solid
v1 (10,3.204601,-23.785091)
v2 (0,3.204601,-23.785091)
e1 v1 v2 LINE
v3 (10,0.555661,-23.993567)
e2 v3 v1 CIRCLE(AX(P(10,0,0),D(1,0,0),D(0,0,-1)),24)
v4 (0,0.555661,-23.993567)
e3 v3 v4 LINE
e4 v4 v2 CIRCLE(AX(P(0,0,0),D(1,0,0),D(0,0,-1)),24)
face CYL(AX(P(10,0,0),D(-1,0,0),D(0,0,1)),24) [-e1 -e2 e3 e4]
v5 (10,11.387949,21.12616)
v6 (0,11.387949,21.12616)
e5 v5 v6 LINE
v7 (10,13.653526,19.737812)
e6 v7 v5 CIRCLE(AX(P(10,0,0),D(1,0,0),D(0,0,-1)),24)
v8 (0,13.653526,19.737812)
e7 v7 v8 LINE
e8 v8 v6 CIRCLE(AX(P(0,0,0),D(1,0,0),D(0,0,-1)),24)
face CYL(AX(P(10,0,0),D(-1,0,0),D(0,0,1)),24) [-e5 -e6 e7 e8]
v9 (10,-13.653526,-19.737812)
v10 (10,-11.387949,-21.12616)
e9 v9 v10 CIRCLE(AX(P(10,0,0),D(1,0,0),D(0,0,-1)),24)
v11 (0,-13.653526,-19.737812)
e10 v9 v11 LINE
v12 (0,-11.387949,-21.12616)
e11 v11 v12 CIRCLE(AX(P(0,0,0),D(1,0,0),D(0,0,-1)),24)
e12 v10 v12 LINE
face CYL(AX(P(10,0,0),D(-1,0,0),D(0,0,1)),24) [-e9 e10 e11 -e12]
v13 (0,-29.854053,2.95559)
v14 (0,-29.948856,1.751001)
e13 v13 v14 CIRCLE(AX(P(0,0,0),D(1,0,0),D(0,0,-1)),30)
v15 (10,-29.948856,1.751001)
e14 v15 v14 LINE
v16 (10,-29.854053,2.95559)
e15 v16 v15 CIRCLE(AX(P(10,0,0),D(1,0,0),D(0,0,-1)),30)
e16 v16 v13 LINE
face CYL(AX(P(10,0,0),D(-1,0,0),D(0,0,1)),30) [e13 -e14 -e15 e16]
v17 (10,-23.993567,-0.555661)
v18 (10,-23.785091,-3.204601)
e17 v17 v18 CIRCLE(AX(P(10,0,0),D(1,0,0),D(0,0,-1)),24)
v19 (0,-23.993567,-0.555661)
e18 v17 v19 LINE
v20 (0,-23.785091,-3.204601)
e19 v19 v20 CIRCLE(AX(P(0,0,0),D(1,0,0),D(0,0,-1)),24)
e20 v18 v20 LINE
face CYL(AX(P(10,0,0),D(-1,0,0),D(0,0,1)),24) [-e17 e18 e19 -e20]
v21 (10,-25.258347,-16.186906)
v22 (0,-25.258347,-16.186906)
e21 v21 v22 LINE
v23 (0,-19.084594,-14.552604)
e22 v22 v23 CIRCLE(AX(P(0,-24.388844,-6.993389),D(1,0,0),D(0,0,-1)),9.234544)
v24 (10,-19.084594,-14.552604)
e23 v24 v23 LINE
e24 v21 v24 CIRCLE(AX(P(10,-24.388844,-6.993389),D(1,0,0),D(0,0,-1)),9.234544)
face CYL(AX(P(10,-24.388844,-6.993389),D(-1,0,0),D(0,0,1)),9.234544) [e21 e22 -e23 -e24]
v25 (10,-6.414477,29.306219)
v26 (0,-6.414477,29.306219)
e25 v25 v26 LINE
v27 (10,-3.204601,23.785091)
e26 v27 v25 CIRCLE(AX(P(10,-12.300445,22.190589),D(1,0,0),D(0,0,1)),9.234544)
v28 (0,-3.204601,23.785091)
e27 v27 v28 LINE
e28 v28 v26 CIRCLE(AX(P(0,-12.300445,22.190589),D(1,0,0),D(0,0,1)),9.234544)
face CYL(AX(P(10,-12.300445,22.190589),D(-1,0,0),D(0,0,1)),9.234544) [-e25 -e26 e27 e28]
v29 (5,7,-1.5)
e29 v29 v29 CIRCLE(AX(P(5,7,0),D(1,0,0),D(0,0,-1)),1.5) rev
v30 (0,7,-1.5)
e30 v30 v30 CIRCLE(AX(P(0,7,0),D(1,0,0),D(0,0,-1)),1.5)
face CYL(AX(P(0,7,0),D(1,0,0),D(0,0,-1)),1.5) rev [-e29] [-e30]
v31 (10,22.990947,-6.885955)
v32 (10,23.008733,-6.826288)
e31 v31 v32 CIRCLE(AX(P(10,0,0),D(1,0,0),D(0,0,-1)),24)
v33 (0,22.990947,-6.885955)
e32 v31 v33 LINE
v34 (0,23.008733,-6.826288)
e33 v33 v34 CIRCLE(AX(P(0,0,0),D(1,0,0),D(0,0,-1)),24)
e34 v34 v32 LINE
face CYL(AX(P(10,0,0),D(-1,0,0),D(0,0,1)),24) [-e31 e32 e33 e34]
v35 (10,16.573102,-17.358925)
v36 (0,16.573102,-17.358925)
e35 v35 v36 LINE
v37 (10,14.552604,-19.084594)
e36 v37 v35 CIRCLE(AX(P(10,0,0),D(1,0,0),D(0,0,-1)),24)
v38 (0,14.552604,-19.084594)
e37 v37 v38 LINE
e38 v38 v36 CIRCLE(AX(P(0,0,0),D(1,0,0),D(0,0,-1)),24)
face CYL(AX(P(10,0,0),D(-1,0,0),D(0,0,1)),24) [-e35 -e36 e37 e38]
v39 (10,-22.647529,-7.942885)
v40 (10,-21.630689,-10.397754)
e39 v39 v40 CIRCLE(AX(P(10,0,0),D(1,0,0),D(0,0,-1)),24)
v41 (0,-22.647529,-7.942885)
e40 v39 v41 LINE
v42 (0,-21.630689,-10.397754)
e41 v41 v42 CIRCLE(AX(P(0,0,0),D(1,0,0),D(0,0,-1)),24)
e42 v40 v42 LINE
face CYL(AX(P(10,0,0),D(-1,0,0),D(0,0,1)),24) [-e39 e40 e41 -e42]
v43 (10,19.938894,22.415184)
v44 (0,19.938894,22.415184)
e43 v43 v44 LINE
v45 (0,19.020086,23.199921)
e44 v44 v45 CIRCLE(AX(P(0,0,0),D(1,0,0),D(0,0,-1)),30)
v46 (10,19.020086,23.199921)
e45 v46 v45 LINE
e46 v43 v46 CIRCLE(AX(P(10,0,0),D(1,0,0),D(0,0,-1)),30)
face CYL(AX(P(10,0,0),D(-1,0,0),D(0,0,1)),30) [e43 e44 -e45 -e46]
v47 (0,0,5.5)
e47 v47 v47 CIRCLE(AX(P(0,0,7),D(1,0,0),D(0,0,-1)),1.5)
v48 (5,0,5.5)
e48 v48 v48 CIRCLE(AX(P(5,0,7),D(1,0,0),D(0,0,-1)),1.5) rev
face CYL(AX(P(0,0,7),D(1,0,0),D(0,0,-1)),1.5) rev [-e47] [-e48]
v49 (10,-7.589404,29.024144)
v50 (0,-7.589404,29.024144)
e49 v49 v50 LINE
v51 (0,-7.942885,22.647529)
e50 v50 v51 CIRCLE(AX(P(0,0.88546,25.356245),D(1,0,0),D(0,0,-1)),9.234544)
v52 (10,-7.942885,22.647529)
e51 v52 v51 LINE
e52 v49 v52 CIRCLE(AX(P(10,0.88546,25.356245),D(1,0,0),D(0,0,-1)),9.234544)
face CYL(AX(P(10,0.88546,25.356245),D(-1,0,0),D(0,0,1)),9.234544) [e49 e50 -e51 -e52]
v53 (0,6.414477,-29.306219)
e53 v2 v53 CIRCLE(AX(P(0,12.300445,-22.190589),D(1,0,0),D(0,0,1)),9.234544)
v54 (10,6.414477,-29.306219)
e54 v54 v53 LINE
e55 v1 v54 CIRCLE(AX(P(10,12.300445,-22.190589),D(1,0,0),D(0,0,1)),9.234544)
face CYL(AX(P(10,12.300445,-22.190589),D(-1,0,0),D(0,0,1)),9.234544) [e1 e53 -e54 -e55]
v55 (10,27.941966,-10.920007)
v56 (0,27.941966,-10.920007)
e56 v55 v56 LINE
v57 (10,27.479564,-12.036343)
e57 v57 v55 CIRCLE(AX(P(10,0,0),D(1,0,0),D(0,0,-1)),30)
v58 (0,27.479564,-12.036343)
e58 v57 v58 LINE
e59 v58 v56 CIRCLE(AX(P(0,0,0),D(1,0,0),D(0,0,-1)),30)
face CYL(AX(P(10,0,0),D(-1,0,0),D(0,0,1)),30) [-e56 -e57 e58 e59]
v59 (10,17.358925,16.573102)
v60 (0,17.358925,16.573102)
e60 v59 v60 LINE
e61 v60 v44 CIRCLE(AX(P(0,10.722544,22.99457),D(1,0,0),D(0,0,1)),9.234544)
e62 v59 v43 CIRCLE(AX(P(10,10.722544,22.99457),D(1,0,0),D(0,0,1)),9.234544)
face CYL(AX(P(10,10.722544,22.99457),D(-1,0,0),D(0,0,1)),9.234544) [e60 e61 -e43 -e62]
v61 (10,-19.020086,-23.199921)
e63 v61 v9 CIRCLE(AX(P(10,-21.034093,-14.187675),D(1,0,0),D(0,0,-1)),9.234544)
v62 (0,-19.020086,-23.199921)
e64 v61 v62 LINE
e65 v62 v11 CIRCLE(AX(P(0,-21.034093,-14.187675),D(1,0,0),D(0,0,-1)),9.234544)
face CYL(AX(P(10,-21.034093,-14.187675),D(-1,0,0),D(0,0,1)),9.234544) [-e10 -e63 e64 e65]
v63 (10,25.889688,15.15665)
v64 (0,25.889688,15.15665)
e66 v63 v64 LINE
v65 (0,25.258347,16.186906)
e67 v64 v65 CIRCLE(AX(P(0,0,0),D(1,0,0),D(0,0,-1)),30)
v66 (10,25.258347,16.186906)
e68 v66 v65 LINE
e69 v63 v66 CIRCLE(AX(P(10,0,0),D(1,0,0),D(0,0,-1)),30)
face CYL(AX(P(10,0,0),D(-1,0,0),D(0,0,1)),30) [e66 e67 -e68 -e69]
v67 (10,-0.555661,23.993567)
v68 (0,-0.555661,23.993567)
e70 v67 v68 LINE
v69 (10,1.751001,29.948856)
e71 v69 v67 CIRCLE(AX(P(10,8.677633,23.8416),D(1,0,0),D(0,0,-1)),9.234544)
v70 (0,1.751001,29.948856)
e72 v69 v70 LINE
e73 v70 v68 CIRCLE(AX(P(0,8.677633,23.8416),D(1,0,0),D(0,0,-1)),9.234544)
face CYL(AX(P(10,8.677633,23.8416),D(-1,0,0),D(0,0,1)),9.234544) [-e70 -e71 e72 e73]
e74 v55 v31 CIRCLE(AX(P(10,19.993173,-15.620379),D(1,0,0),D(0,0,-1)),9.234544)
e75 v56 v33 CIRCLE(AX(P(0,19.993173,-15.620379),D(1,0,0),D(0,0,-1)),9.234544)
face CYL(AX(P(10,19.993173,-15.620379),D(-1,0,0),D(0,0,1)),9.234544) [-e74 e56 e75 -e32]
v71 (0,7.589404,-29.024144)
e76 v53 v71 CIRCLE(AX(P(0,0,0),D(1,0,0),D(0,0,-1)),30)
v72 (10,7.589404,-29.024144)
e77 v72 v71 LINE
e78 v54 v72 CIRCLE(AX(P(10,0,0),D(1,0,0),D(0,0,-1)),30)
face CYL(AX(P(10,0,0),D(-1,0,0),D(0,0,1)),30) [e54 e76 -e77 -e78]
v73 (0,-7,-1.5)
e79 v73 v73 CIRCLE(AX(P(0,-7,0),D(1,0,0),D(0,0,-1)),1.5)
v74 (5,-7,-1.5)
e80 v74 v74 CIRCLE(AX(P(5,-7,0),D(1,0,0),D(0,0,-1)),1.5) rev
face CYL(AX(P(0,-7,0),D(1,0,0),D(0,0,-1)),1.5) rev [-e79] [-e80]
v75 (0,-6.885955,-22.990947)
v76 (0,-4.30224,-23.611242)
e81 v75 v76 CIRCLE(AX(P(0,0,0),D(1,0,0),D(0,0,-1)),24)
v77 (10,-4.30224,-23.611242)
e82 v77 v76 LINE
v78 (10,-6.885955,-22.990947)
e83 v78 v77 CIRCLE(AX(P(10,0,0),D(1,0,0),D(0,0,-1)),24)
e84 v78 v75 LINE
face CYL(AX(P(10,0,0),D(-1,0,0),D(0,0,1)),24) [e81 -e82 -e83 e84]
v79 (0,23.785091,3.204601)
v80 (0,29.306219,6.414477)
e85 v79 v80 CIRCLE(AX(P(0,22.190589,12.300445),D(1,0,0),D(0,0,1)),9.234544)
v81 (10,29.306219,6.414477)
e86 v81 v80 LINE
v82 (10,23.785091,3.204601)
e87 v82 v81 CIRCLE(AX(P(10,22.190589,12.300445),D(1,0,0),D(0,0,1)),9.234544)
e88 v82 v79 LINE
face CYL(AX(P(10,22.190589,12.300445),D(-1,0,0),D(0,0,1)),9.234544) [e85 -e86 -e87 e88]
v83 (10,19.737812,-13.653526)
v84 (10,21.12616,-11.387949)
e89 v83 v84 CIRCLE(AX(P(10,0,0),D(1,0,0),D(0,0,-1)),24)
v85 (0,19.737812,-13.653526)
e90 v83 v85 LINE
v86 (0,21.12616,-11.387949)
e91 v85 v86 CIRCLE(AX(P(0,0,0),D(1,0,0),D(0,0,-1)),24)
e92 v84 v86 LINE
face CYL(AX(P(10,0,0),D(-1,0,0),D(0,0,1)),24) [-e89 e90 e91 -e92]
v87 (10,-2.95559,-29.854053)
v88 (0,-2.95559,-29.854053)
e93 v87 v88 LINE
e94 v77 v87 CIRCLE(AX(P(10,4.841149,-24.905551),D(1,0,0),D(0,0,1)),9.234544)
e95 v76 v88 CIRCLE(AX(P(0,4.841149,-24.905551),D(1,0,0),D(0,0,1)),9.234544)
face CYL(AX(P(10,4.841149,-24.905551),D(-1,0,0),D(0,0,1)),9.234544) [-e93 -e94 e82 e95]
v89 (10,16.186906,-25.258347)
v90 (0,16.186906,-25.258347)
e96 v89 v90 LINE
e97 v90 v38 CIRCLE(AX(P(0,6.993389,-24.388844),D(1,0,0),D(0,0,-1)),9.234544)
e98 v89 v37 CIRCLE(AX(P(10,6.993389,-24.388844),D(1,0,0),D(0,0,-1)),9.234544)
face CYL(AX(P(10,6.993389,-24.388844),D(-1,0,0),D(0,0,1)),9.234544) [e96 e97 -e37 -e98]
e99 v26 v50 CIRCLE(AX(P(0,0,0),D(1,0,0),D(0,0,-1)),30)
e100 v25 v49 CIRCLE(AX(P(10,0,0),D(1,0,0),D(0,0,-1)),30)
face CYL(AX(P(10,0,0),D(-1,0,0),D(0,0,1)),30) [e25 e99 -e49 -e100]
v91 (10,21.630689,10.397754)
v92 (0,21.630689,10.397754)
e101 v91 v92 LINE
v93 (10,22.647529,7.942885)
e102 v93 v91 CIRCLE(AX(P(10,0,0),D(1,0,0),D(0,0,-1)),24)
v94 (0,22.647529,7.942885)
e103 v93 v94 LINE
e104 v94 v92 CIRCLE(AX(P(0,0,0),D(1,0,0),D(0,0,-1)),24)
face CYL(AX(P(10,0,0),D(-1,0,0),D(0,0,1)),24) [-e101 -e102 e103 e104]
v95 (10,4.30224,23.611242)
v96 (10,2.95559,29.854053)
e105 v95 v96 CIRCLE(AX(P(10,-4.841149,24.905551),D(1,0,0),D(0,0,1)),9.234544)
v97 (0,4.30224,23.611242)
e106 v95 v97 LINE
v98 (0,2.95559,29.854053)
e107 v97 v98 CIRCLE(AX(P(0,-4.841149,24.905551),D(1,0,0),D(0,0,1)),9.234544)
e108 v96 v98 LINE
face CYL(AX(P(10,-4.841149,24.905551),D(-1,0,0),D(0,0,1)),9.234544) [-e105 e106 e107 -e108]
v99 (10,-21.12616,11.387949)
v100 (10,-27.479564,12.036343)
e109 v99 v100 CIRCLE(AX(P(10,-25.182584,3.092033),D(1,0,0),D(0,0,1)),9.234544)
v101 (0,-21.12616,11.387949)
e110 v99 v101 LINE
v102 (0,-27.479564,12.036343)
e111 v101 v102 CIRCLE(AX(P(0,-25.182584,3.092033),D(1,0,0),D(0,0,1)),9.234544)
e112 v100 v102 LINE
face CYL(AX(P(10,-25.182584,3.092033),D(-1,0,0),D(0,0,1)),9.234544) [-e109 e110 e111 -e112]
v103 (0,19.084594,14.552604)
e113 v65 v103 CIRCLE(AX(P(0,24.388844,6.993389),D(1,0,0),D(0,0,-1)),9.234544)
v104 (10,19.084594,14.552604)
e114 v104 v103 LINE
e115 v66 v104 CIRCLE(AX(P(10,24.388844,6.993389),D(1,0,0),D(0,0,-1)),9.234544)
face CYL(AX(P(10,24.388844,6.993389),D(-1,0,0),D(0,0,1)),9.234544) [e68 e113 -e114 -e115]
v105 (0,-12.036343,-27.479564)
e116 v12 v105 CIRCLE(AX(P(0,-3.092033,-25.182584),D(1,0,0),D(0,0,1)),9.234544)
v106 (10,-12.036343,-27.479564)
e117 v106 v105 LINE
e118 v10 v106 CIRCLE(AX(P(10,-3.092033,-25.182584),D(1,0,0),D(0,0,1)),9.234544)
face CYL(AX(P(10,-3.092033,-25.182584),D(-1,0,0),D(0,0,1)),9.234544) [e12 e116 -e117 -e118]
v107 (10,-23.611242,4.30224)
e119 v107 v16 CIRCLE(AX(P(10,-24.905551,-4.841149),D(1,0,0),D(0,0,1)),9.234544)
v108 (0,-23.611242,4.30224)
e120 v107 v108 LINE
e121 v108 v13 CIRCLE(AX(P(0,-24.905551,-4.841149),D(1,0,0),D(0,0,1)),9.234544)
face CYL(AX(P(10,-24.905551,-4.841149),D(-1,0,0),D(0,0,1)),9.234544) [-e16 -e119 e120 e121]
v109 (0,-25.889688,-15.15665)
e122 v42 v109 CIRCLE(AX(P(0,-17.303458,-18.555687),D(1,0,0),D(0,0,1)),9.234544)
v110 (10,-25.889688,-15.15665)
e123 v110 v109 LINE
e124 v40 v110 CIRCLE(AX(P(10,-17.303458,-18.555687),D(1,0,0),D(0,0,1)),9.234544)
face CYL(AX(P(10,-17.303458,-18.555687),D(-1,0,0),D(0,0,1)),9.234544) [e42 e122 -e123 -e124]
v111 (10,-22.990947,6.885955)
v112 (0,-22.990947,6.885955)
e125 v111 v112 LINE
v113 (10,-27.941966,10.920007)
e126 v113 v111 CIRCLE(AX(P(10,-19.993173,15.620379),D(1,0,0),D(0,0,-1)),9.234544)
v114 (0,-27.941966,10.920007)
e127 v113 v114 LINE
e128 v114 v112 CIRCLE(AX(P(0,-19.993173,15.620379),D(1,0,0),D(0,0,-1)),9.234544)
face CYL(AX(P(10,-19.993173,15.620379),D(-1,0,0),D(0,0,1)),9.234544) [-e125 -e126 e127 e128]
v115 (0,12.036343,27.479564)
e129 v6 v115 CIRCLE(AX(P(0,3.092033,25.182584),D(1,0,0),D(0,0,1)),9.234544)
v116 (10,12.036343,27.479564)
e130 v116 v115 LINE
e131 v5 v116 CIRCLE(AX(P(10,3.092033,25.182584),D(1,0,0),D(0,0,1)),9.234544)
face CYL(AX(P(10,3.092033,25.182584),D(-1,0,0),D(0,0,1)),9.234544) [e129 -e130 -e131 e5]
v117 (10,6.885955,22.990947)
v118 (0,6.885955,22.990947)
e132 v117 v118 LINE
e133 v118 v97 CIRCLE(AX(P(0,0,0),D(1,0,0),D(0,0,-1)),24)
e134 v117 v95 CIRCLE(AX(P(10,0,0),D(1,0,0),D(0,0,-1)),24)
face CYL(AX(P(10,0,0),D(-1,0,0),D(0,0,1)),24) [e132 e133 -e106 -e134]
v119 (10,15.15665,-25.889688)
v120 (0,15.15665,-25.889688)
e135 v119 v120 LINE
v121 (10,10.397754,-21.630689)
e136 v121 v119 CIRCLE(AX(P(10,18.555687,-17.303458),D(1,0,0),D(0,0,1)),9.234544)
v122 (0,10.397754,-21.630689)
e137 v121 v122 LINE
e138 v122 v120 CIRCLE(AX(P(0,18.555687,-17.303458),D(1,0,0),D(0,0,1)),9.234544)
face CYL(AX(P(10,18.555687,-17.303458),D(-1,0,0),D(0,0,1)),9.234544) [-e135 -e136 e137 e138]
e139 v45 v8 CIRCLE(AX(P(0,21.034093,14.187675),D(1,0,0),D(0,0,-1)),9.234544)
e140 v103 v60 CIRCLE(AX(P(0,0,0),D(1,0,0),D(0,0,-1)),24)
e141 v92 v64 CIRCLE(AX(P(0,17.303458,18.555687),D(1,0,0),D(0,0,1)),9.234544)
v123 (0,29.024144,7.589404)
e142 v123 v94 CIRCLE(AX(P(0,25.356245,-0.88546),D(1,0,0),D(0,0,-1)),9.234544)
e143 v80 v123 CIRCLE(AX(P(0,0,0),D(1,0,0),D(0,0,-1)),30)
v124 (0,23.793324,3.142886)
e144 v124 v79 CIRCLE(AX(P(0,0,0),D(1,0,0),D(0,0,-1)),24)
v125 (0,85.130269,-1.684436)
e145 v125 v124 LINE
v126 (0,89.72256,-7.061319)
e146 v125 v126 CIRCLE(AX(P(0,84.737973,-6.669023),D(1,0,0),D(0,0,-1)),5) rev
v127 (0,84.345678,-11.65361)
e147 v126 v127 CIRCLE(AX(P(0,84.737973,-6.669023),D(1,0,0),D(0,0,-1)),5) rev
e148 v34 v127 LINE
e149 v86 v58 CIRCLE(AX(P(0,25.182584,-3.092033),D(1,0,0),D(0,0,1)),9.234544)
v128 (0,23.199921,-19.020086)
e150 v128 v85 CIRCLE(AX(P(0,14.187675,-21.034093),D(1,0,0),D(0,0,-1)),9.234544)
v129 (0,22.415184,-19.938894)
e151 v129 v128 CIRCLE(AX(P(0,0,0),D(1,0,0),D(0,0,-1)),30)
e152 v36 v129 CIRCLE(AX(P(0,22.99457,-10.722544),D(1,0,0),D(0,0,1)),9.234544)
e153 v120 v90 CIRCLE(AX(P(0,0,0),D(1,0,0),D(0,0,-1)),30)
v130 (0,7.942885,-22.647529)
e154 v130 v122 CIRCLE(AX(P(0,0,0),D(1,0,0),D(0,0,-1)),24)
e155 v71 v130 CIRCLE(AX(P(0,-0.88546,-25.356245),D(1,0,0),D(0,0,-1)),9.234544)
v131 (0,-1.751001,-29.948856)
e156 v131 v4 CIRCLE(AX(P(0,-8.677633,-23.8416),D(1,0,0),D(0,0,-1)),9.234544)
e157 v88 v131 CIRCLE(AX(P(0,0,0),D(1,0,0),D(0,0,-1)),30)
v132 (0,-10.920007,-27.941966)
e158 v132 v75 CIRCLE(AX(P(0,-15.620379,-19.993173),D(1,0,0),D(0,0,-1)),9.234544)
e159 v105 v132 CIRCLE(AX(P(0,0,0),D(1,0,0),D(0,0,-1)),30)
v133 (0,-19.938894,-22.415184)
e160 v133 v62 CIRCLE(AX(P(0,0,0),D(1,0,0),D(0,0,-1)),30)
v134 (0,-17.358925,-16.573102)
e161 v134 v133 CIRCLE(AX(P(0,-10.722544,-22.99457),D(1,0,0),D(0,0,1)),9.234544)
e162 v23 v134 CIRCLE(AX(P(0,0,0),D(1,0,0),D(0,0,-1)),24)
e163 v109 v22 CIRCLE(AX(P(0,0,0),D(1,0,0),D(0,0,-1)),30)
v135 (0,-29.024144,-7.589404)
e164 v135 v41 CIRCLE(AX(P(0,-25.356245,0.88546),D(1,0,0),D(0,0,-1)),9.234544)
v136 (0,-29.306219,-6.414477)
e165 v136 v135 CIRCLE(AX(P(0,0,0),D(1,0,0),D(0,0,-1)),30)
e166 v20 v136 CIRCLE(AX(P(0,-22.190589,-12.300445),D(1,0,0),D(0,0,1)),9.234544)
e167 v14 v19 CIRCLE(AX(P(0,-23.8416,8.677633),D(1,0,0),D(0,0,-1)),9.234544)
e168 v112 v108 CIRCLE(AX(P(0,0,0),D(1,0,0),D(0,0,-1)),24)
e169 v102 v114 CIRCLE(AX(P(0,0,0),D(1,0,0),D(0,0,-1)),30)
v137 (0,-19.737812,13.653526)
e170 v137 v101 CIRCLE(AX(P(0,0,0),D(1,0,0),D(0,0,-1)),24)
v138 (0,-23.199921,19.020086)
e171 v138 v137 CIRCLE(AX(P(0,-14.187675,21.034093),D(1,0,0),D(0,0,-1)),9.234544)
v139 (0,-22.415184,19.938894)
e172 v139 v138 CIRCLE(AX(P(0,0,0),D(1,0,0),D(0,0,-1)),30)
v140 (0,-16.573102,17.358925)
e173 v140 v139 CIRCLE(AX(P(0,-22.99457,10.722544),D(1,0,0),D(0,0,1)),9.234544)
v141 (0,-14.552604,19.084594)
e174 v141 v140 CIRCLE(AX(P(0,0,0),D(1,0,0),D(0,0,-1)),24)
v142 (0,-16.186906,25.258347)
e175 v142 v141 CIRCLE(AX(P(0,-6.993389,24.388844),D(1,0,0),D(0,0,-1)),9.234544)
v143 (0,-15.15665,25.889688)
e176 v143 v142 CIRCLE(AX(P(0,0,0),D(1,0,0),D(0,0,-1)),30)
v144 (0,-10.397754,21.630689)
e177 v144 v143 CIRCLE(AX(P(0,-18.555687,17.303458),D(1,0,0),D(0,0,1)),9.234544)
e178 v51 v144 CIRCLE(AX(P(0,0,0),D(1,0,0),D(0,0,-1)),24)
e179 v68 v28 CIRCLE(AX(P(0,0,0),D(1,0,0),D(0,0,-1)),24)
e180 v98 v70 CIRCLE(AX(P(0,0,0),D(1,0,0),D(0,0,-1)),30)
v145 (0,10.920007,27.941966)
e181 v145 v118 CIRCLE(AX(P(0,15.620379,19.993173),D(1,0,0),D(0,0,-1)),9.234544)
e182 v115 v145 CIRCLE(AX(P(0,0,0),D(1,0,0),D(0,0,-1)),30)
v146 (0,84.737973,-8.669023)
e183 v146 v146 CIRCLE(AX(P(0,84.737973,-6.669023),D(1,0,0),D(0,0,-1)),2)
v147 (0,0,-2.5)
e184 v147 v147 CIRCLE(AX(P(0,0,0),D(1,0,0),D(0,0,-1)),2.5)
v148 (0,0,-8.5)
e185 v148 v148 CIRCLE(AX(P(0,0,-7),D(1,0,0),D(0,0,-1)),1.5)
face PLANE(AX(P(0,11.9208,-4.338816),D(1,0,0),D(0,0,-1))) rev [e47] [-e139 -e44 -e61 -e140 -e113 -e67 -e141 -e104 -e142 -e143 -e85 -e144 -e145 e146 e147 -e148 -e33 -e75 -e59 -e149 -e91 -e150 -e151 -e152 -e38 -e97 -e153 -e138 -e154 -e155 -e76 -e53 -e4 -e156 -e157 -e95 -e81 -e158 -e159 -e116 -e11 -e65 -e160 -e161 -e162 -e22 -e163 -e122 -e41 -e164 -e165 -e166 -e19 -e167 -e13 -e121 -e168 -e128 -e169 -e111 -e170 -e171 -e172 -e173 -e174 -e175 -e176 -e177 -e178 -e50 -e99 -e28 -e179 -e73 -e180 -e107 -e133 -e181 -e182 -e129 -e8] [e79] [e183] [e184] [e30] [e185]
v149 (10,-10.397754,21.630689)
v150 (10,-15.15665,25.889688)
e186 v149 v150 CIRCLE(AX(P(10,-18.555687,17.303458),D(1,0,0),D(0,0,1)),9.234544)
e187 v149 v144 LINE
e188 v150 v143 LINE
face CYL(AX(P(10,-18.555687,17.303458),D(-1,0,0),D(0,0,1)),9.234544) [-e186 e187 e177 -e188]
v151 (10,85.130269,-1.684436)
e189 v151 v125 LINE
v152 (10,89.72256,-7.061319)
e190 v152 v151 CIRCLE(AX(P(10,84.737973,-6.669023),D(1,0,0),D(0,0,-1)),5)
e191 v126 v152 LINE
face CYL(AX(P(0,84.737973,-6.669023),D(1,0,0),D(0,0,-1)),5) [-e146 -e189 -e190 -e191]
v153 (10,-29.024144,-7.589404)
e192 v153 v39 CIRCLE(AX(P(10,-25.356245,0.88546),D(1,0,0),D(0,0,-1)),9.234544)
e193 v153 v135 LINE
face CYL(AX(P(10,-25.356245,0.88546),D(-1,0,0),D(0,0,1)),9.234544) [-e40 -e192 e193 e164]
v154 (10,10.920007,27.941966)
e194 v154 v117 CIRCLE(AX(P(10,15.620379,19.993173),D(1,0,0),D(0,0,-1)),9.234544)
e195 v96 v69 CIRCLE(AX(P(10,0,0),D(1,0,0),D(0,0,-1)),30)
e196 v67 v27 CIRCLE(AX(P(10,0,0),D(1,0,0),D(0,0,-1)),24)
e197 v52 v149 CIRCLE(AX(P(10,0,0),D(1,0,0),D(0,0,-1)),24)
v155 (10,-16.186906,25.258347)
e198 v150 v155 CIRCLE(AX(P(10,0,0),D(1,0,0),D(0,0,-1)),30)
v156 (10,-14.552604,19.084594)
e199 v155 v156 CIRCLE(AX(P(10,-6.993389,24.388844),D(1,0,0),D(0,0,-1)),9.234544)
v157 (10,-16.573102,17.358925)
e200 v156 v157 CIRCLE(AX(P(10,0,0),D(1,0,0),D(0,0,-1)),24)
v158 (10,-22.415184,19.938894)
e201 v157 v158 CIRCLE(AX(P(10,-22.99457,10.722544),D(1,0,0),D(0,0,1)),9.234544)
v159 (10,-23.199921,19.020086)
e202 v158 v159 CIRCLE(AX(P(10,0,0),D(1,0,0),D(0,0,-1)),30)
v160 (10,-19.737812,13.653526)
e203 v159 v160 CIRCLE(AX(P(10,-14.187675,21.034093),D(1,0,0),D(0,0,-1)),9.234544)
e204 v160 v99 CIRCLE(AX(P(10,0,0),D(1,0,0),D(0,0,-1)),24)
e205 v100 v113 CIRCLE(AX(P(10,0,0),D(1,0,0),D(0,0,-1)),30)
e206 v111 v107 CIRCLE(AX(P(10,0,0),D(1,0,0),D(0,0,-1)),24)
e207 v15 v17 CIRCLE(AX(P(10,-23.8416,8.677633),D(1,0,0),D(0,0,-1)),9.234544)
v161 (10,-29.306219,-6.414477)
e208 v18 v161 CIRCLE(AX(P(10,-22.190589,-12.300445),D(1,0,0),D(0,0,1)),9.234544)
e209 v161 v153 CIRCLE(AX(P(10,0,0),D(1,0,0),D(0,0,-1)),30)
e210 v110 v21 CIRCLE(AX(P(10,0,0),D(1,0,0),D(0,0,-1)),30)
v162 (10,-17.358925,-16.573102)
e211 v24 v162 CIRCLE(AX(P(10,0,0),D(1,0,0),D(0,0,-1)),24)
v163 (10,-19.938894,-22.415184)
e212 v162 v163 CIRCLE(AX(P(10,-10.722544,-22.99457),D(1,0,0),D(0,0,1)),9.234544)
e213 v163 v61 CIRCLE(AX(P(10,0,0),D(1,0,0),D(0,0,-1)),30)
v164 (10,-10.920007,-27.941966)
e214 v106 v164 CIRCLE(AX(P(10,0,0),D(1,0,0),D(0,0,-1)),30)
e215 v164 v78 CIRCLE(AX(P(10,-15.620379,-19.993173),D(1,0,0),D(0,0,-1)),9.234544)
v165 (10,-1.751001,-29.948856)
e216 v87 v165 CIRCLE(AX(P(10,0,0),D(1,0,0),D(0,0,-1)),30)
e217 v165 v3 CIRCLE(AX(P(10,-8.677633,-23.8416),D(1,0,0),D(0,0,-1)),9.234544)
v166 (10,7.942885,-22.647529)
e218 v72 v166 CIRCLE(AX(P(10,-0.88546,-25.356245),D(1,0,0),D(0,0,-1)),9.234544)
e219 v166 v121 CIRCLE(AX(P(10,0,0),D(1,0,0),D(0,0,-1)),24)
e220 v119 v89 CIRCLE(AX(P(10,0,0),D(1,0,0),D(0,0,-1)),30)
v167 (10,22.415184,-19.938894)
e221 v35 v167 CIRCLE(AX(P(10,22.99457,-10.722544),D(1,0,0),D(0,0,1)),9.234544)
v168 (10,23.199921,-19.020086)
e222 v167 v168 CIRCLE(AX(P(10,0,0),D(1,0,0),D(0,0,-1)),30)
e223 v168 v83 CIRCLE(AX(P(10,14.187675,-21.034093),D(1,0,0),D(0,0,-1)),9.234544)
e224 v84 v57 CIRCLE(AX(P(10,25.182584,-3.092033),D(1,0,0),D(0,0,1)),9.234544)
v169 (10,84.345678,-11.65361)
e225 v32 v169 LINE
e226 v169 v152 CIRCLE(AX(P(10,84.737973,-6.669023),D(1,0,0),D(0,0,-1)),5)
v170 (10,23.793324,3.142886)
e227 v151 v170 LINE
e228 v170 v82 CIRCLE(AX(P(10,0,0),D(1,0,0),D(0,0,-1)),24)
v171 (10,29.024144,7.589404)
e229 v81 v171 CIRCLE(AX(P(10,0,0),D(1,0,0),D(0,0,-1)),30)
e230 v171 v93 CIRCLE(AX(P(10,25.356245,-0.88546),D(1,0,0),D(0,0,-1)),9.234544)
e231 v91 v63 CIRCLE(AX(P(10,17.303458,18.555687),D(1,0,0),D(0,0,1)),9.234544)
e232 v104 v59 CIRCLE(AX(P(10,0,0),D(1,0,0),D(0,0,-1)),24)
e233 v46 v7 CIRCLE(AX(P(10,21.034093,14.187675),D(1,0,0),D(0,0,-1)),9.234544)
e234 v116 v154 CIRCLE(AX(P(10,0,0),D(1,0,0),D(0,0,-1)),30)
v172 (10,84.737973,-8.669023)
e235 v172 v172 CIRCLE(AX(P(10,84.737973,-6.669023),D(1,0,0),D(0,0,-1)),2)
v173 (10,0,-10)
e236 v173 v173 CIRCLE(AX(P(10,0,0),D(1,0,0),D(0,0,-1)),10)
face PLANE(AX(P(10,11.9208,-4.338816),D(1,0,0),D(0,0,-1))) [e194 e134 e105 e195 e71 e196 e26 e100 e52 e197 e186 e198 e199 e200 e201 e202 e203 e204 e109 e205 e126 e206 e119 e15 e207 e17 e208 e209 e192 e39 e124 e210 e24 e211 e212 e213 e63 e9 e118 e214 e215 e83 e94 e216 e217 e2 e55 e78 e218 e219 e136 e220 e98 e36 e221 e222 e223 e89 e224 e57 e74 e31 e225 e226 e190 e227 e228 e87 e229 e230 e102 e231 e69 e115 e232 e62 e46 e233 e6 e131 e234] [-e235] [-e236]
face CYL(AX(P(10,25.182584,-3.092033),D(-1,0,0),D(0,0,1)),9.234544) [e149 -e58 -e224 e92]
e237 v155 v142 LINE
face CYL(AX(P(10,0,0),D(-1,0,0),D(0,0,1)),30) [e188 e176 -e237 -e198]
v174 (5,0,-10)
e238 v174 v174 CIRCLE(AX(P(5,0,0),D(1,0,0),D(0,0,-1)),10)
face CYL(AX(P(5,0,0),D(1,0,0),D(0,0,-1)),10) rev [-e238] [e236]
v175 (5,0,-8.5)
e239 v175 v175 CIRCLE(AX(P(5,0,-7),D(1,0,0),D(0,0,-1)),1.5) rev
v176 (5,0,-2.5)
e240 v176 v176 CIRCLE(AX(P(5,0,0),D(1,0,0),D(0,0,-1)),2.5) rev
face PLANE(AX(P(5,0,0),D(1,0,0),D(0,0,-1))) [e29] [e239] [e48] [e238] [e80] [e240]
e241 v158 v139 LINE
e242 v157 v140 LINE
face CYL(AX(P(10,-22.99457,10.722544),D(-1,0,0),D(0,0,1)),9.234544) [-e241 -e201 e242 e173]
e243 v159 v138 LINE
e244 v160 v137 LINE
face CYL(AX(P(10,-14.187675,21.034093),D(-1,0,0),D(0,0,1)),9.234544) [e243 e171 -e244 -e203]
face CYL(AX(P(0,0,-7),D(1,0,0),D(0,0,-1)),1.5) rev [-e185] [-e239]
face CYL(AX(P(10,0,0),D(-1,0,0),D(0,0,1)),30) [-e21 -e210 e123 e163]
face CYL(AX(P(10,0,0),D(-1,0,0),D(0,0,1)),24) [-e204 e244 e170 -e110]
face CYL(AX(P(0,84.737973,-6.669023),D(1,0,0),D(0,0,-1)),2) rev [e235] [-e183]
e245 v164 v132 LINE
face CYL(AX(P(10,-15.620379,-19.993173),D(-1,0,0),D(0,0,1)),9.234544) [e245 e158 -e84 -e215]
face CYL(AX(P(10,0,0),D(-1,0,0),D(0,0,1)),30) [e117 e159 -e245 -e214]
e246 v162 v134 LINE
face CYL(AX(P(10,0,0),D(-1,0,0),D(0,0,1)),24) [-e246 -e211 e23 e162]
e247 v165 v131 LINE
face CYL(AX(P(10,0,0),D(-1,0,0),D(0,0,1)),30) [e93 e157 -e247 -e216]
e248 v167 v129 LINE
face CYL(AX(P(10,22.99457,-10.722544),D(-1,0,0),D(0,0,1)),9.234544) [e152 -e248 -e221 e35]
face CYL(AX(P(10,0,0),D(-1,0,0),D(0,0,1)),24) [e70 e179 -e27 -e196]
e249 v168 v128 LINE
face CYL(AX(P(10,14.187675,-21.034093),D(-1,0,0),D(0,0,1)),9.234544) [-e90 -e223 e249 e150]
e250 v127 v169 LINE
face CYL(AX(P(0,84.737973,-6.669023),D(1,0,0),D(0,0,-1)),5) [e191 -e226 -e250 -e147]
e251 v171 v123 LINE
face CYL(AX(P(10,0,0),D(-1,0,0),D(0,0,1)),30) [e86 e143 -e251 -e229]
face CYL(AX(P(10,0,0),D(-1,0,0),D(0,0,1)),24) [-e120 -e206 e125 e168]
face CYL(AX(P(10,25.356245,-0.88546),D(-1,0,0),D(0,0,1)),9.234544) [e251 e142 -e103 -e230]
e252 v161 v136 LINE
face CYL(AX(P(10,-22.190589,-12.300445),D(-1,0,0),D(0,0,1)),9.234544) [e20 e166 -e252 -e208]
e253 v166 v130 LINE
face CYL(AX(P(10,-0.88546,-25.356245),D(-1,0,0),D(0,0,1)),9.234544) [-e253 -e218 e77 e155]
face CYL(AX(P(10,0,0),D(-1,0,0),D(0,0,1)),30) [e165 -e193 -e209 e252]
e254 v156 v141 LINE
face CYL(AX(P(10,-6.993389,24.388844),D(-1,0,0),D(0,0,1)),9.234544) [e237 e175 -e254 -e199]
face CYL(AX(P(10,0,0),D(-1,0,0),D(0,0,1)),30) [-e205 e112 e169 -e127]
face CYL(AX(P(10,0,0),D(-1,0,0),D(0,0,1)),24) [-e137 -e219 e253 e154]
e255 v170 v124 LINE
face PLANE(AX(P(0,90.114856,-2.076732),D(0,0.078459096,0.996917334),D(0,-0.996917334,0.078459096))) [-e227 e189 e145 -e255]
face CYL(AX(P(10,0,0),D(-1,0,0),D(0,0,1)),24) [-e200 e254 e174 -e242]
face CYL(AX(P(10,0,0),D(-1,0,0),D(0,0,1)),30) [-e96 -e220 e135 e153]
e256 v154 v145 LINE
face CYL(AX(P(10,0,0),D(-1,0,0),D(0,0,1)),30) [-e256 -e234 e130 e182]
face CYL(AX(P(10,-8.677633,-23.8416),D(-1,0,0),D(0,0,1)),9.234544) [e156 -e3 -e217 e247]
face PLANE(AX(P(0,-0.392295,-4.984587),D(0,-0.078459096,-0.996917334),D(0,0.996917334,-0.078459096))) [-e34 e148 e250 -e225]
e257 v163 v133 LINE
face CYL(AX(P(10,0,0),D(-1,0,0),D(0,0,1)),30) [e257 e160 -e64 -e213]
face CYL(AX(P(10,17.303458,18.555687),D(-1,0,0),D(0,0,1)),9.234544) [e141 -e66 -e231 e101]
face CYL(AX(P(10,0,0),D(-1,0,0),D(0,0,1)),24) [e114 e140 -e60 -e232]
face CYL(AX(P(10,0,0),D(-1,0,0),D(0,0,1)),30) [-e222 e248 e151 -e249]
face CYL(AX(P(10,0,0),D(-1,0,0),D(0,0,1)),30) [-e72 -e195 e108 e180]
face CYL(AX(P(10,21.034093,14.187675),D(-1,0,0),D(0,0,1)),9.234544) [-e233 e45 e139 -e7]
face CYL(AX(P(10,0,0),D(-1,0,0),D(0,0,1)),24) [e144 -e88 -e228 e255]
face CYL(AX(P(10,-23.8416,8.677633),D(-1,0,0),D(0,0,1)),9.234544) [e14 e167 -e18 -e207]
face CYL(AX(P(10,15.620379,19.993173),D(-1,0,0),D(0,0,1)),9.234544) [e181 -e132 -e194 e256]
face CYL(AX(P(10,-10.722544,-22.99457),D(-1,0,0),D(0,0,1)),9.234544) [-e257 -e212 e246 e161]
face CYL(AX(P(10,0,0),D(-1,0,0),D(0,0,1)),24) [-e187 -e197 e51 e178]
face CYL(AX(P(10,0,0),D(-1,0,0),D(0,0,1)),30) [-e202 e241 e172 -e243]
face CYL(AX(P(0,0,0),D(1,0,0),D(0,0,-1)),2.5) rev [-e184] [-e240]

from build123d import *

# Parameters (mm, degrees)
EXTRUDE_1_DEPTH     = 10
EXTRUDE_2_DEPTH     = 10
FILLET_1_R          = 5
SKETCH_3_R          = 2.5
CUT_EXTRUDE_1_DEPTH = 10
SKETCH_4_R          = 2
CUT_EXTRUDE_2_DEPTH = 10
SKETCH_5_R          = 1.5
CUT_EXTRUDE_3_DEPTH = 10
SKETCH_6_R          = 10
CUT_EXTRUDE_4_DEPTH = 5


with BuildPart() as part:
    # 草图1 → 凸台-拉伸1 (new body)
    with BuildSketch(Plane(origin=(0, 0, 0), x_dir=(0, 0, -1), z_dir=(1, 0, 0))):
        with BuildLine():
            ThreePointArc((-7.942884534, 22.647529341), (-9.184402377, 22.17310878), (-10.397754058, 21.630689091))
            ThreePointArc((-10.397754058, 21.630689091), (-12.397305949, 24.184674774), (-15.156649968, 25.889688329))
            ThreePointArc((-15.156649968, 25.889688329), (-15.674956941, 25.579204931), (-16.186906117, 25.258346549))
            ThreePointArc((-16.186906117, 25.258346549), (-15.920443886, 22.02569307), (-14.552603542, 19.084594053))
            ThreePointArc((-14.552603542, 19.084594053), (-15.58675316, 18.249743174), (-16.573102281, 17.358925105))
            ThreePointArc((-16.573102281, 17.358925105), (-19.264014116, 19.170014316), (-22.41518439, 19.938894372))
            ThreePointArc((-22.41518439, 19.938894372), (-22.812178968, 19.48344145), (-23.199920874, 19.020085999))
            ThreePointArc((-23.199920874, 19.020085999), (-21.947555371, 16.027991201), (-19.737812321, 13.653525728))
            ThreePointArc((-19.737812321, 13.653525728), (-20.463363944, 12.539965553), (-21.126159781, 11.387948582))
            ThreePointArc((-21.126159781, 11.387948582), (-24.245026361, 12.278859291), (-27.479564388, 12.036342512))
            ThreePointArc((-27.479564388, 12.036342512), (-27.716385975, 11.480502971), (-27.941965733, 10.920006912))
            ThreePointArc((-27.941965733, 10.920006912), (-25.82628722, 8.46135788), (-22.990946508, 6.885955175))
            ThreePointArc((-22.990946508, 6.885955175), (-23.33687809, 5.602688733), (-23.611241567, 4.302240308))
            ThreePointArc((-23.611241567, 4.302240308), (-26.852766501, 4.185763967), (-29.854053162, 2.955589584))
            ThreePointArc((-29.854053162, 2.955589584), (-29.907520012, 2.353772872), (-29.948856303, 1.751001464))
            ThreePointArc((-29.948856303, 1.751001464), (-27.176962132, 0.066467896), (-23.993566664, -0.555660648))
            ThreePointArc((-23.993566664, -0.555660648), (-23.92601601, -1.883018297), (-23.785090519, -3.204601222))
            ThreePointArc((-23.785090519, -3.204601222), (-26.831970761, -4.317063099), (-29.306219208, -6.414477044))
            ThreePointArc((-29.306219208, -6.414477044), (-29.171097612, -7.003360916), (-29.024144152, -7.589404208))
            ThreePointArc((-29.024144152, -7.589404208), (-25.867366639, -8.334928429), (-22.647529341, -7.942884534))
            ThreePointArc((-22.647529341, -7.942884534), (-22.17310878, -9.184402377), (-21.630689091, -10.397754058))
            ThreePointArc((-21.630689091, -10.397754058), (-24.184674774, -12.397305949), (-25.889688329, -15.156649968))
            ThreePointArc((-25.889688329, -15.156649968), (-25.579204931, -15.674956941), (-25.258346549, -16.186906117))
            ThreePointArc((-25.258346549, -16.186906117), (-22.02569307, -15.920443886), (-19.084594053, -14.552603542))
            ThreePointArc((-19.084594053, -14.552603542), (-18.249743174, -15.58675316), (-17.358925105, -16.573102281))
            ThreePointArc((-17.358925105, -16.573102281), (-19.170014316, -19.264014116), (-19.938894372, -22.41518439))
            ThreePointArc((-19.938894372, -22.41518439), (-19.48344145, -22.812178968), (-19.020085999, -23.199920874))
            ThreePointArc((-19.020085999, -23.199920874), (-16.027991201, -21.947555371), (-13.653525728, -19.737812321))
            ThreePointArc((-13.653525728, -19.737812321), (-12.539965553, -20.463363944), (-11.387948582, -21.126159781))
            ThreePointArc((-11.387948582, -21.126159781), (-12.278859291, -24.245026361), (-12.036342512, -27.479564388))
            ThreePointArc((-12.036342512, -27.479564388), (-11.480502971, -27.716385975), (-10.920006912, -27.941965733))
            ThreePointArc((-10.920006912, -27.941965733), (-8.46135788, -25.82628722), (-6.885955175, -22.990946508))
            ThreePointArc((-6.885955175, -22.990946508), (-5.602688733, -23.33687809), (-4.302240308, -23.611241567))
            ThreePointArc((-4.302240308, -23.611241567), (-4.185763967, -26.852766501), (-2.955589584, -29.854053162))
            ThreePointArc((-2.955589584, -29.854053162), (-2.353772872, -29.907520012), (-1.751001464, -29.948856303))
            ThreePointArc((-1.751001464, -29.948856303), (-0.066467896, -27.176962132), (0.555660648, -23.993566664))
            ThreePointArc((0.555660648, -23.993566664), (1.883018297, -23.92601601), (3.204601222, -23.785090519))
            ThreePointArc((3.204601222, -23.785090519), (4.317063099, -26.831970761), (6.414477044, -29.306219208))
            ThreePointArc((6.414477044, -29.306219208), (7.003360916, -29.171097612), (7.589404208, -29.024144152))
            ThreePointArc((7.589404208, -29.024144152), (8.334928429, -25.867366639), (7.942884534, -22.647529341))
            ThreePointArc((7.942884534, -22.647529341), (9.184402377, -22.17310878), (10.397754058, -21.630689091))
            ThreePointArc((10.397754058, -21.630689091), (12.397305949, -24.184674774), (15.156649968, -25.889688329))
            ThreePointArc((15.156649968, -25.889688329), (15.674956941, -25.579204931), (16.186906117, -25.258346549))
            ThreePointArc((16.186906117, -25.258346549), (15.920443886, -22.02569307), (14.552603542, -19.084594053))
            ThreePointArc((14.552603542, -19.084594053), (15.58675316, -18.249743174), (16.573102281, -17.358925105))
            ThreePointArc((16.573102281, -17.358925105), (19.264014116, -19.170014316), (22.41518439, -19.938894372))
            ThreePointArc((22.41518439, -19.938894372), (22.812178968, -19.48344145), (23.199920874, -19.020085999))
            ThreePointArc((23.199920874, -19.020085999), (21.947555371, -16.027991201), (19.737812321, -13.653525728))
            ThreePointArc((19.737812321, -13.653525728), (20.463363944, -12.539965553), (21.126159781, -11.387948582))
            ThreePointArc((21.126159781, -11.387948582), (24.245026361, -12.278859291), (27.479564388, -12.036342512))
            ThreePointArc((27.479564388, -12.036342512), (27.716385975, -11.480502971), (27.941965733, -10.920006912))
            ThreePointArc((27.941965733, -10.920006912), (25.82628722, -8.46135788), (22.990946508, -6.885955175))
            ThreePointArc((22.990946508, -6.885955175), (23.33687809, -5.602688733), (23.611241567, -4.302240308))
            ThreePointArc((23.611241567, -4.302240308), (26.852766501, -4.185763967), (29.854053162, -2.955589584))
            ThreePointArc((29.854053162, -2.955589584), (29.907520012, -2.353772872), (29.948856303, -1.751001464))
            ThreePointArc((29.948856303, -1.751001464), (27.176962132, -0.066467896), (23.993566664, 0.555660648))
            ThreePointArc((23.993566664, 0.555660648), (23.92601601, 1.883018297), (23.785090519, 3.204601222))
            ThreePointArc((23.785090519, 3.204601222), (26.831970761, 4.317063099), (29.306219208, 6.414477044))
            ThreePointArc((29.306219208, 6.414477044), (29.171097612, 7.003360916), (29.024144152, 7.589404208))
            ThreePointArc((29.024144152, 7.589404208), (25.867366639, 8.334928429), (22.647529341, 7.942884534))
            ThreePointArc((22.647529341, 7.942884534), (22.17310878, 9.184402377), (21.630689091, 10.397754058))
            ThreePointArc((21.630689091, 10.397754058), (24.184674774, 12.397305949), (25.889688329, 15.156649968))
            ThreePointArc((25.889688329, 15.156649968), (25.579204931, 15.674956941), (25.258346549, 16.186906117))
            ThreePointArc((25.258346549, 16.186906117), (22.02569307, 15.920443886), (19.084594053, 14.552603542))
            ThreePointArc((19.084594053, 14.552603542), (18.249743174, 15.58675316), (17.358925105, 16.573102281))
            ThreePointArc((17.358925105, 16.573102281), (19.170014316, 19.264014116), (19.938894372, 22.41518439))
            ThreePointArc((19.938894372, 22.41518439), (19.48344145, 22.812178968), (19.020085999, 23.199920874))
            ThreePointArc((19.020085999, 23.199920874), (16.027991201, 21.947555371), (13.653525728, 19.737812321))
            ThreePointArc((13.653525728, 19.737812321), (12.539965553, 20.463363944), (11.387948582, 21.126159781))
            ThreePointArc((11.387948582, 21.126159781), (12.278859291, 24.245026361), (12.036342512, 27.479564388))
            ThreePointArc((12.036342512, 27.479564388), (11.480502971, 27.716385975), (10.920006912, 27.941965733))
            ThreePointArc((10.920006912, 27.941965733), (8.46135788, 25.82628722), (6.885955175, 22.990946508))
            ThreePointArc((6.885955175, 22.990946508), (5.602688733, 23.33687809), (4.302240308, 23.611241567))
            ThreePointArc((4.302240308, 23.611241567), (4.185763967, 26.852766501), (2.955589584, 29.854053162))
            ThreePointArc((2.955589584, 29.854053162), (2.353772872, 29.907520012), (1.751001464, 29.948856303))
            ThreePointArc((1.751001464, 29.948856303), (0.066467896, 27.176962132), (-0.555660648, 23.993566664))
            ThreePointArc((-0.555660648, 23.993566664), (-1.883018297, 23.92601601), (-3.204601222, 23.785090519))
            ThreePointArc((-3.204601222, 23.785090519), (-4.317063099, 26.831970761), (-6.414477044, 29.306219208))
            ThreePointArc((-6.414477044, 29.306219208), (-7.003360916, 29.171097612), (-7.589404208, 29.024144152))
            ThreePointArc((-7.589404208, 29.024144152), (-8.334928429, 25.867366639), (-7.942884534, 22.647529341))
        make_face()
    extrude(amount=EXTRUDE_1_DEPTH)

    # 草图2 → 凸台-拉伸2 (add)
    with BuildSketch(Plane(origin=(10, 0, 0), x_dir=(0, 0, -1), z_dir=(1, 0, 0))):
        Polygon((2.076731947, 90.114855515), (-4.984586669, 0.392295479), (4.984586669, -0.392295479), (12.045905284, 89.330264557), align=None)
    extrude(amount=-EXTRUDE_2_DEPTH)

    # 圆角1
    fillet_1_edges = [part.edges().sort_by_distance(p)[0] for p in [
        (5, 89.330264557, -12.045905284),
        (5, 90.114855515, -2.076731947),
    ]]
    fillet(fillet_1_edges, radius=FILLET_1_R - 0.0001)  # a hair under: the kernel refuses the full size

    # 草图3 → 切除-拉伸1 (cut)
    with BuildSketch(Plane(origin=(10, 0, 0), x_dir=(0, 0, -1), z_dir=(1, 0, 0))):
        Circle(SKETCH_3_R)
    extrude(amount=-CUT_EXTRUDE_1_DEPTH, mode=Mode.SUBTRACT)

    # 草图4 → 切除-拉伸2 (cut)
    with BuildSketch(Plane(origin=(10, 0, 0), x_dir=(0, 0, -1), z_dir=(1, 0, 0))):
        with Locations((6.669023137, 84.737973367)):
            Circle(SKETCH_4_R)
    extrude(amount=-CUT_EXTRUDE_2_DEPTH, mode=Mode.SUBTRACT)

    # 草图5 → 切除-拉伸3 (cut)
    with BuildSketch(Plane(origin=(10, 0, 0), x_dir=(0, 0, -1), z_dir=(1, 0, 0))):
        with Locations((0, 7)):
            Circle(SKETCH_5_R)
        with Locations((7, 0)):
            Circle(SKETCH_5_R)
        with Locations((0, -7)):
            Circle(SKETCH_5_R)
        with Locations((-7, 0)):
            Circle(SKETCH_5_R)
    extrude(amount=-CUT_EXTRUDE_3_DEPTH, mode=Mode.SUBTRACT)

    # 草图6 → 切除-拉伸4 (cut)
    with BuildSketch(Plane(origin=(10, 0, 0), x_dir=(0, 0, -1), z_dir=(1, 0, 0))):
        Circle(SKETCH_6_R)
    extrude(amount=-CUT_EXTRUDE_4_DEPTH, mode=Mode.SUBTRACT)


solid = part.part
